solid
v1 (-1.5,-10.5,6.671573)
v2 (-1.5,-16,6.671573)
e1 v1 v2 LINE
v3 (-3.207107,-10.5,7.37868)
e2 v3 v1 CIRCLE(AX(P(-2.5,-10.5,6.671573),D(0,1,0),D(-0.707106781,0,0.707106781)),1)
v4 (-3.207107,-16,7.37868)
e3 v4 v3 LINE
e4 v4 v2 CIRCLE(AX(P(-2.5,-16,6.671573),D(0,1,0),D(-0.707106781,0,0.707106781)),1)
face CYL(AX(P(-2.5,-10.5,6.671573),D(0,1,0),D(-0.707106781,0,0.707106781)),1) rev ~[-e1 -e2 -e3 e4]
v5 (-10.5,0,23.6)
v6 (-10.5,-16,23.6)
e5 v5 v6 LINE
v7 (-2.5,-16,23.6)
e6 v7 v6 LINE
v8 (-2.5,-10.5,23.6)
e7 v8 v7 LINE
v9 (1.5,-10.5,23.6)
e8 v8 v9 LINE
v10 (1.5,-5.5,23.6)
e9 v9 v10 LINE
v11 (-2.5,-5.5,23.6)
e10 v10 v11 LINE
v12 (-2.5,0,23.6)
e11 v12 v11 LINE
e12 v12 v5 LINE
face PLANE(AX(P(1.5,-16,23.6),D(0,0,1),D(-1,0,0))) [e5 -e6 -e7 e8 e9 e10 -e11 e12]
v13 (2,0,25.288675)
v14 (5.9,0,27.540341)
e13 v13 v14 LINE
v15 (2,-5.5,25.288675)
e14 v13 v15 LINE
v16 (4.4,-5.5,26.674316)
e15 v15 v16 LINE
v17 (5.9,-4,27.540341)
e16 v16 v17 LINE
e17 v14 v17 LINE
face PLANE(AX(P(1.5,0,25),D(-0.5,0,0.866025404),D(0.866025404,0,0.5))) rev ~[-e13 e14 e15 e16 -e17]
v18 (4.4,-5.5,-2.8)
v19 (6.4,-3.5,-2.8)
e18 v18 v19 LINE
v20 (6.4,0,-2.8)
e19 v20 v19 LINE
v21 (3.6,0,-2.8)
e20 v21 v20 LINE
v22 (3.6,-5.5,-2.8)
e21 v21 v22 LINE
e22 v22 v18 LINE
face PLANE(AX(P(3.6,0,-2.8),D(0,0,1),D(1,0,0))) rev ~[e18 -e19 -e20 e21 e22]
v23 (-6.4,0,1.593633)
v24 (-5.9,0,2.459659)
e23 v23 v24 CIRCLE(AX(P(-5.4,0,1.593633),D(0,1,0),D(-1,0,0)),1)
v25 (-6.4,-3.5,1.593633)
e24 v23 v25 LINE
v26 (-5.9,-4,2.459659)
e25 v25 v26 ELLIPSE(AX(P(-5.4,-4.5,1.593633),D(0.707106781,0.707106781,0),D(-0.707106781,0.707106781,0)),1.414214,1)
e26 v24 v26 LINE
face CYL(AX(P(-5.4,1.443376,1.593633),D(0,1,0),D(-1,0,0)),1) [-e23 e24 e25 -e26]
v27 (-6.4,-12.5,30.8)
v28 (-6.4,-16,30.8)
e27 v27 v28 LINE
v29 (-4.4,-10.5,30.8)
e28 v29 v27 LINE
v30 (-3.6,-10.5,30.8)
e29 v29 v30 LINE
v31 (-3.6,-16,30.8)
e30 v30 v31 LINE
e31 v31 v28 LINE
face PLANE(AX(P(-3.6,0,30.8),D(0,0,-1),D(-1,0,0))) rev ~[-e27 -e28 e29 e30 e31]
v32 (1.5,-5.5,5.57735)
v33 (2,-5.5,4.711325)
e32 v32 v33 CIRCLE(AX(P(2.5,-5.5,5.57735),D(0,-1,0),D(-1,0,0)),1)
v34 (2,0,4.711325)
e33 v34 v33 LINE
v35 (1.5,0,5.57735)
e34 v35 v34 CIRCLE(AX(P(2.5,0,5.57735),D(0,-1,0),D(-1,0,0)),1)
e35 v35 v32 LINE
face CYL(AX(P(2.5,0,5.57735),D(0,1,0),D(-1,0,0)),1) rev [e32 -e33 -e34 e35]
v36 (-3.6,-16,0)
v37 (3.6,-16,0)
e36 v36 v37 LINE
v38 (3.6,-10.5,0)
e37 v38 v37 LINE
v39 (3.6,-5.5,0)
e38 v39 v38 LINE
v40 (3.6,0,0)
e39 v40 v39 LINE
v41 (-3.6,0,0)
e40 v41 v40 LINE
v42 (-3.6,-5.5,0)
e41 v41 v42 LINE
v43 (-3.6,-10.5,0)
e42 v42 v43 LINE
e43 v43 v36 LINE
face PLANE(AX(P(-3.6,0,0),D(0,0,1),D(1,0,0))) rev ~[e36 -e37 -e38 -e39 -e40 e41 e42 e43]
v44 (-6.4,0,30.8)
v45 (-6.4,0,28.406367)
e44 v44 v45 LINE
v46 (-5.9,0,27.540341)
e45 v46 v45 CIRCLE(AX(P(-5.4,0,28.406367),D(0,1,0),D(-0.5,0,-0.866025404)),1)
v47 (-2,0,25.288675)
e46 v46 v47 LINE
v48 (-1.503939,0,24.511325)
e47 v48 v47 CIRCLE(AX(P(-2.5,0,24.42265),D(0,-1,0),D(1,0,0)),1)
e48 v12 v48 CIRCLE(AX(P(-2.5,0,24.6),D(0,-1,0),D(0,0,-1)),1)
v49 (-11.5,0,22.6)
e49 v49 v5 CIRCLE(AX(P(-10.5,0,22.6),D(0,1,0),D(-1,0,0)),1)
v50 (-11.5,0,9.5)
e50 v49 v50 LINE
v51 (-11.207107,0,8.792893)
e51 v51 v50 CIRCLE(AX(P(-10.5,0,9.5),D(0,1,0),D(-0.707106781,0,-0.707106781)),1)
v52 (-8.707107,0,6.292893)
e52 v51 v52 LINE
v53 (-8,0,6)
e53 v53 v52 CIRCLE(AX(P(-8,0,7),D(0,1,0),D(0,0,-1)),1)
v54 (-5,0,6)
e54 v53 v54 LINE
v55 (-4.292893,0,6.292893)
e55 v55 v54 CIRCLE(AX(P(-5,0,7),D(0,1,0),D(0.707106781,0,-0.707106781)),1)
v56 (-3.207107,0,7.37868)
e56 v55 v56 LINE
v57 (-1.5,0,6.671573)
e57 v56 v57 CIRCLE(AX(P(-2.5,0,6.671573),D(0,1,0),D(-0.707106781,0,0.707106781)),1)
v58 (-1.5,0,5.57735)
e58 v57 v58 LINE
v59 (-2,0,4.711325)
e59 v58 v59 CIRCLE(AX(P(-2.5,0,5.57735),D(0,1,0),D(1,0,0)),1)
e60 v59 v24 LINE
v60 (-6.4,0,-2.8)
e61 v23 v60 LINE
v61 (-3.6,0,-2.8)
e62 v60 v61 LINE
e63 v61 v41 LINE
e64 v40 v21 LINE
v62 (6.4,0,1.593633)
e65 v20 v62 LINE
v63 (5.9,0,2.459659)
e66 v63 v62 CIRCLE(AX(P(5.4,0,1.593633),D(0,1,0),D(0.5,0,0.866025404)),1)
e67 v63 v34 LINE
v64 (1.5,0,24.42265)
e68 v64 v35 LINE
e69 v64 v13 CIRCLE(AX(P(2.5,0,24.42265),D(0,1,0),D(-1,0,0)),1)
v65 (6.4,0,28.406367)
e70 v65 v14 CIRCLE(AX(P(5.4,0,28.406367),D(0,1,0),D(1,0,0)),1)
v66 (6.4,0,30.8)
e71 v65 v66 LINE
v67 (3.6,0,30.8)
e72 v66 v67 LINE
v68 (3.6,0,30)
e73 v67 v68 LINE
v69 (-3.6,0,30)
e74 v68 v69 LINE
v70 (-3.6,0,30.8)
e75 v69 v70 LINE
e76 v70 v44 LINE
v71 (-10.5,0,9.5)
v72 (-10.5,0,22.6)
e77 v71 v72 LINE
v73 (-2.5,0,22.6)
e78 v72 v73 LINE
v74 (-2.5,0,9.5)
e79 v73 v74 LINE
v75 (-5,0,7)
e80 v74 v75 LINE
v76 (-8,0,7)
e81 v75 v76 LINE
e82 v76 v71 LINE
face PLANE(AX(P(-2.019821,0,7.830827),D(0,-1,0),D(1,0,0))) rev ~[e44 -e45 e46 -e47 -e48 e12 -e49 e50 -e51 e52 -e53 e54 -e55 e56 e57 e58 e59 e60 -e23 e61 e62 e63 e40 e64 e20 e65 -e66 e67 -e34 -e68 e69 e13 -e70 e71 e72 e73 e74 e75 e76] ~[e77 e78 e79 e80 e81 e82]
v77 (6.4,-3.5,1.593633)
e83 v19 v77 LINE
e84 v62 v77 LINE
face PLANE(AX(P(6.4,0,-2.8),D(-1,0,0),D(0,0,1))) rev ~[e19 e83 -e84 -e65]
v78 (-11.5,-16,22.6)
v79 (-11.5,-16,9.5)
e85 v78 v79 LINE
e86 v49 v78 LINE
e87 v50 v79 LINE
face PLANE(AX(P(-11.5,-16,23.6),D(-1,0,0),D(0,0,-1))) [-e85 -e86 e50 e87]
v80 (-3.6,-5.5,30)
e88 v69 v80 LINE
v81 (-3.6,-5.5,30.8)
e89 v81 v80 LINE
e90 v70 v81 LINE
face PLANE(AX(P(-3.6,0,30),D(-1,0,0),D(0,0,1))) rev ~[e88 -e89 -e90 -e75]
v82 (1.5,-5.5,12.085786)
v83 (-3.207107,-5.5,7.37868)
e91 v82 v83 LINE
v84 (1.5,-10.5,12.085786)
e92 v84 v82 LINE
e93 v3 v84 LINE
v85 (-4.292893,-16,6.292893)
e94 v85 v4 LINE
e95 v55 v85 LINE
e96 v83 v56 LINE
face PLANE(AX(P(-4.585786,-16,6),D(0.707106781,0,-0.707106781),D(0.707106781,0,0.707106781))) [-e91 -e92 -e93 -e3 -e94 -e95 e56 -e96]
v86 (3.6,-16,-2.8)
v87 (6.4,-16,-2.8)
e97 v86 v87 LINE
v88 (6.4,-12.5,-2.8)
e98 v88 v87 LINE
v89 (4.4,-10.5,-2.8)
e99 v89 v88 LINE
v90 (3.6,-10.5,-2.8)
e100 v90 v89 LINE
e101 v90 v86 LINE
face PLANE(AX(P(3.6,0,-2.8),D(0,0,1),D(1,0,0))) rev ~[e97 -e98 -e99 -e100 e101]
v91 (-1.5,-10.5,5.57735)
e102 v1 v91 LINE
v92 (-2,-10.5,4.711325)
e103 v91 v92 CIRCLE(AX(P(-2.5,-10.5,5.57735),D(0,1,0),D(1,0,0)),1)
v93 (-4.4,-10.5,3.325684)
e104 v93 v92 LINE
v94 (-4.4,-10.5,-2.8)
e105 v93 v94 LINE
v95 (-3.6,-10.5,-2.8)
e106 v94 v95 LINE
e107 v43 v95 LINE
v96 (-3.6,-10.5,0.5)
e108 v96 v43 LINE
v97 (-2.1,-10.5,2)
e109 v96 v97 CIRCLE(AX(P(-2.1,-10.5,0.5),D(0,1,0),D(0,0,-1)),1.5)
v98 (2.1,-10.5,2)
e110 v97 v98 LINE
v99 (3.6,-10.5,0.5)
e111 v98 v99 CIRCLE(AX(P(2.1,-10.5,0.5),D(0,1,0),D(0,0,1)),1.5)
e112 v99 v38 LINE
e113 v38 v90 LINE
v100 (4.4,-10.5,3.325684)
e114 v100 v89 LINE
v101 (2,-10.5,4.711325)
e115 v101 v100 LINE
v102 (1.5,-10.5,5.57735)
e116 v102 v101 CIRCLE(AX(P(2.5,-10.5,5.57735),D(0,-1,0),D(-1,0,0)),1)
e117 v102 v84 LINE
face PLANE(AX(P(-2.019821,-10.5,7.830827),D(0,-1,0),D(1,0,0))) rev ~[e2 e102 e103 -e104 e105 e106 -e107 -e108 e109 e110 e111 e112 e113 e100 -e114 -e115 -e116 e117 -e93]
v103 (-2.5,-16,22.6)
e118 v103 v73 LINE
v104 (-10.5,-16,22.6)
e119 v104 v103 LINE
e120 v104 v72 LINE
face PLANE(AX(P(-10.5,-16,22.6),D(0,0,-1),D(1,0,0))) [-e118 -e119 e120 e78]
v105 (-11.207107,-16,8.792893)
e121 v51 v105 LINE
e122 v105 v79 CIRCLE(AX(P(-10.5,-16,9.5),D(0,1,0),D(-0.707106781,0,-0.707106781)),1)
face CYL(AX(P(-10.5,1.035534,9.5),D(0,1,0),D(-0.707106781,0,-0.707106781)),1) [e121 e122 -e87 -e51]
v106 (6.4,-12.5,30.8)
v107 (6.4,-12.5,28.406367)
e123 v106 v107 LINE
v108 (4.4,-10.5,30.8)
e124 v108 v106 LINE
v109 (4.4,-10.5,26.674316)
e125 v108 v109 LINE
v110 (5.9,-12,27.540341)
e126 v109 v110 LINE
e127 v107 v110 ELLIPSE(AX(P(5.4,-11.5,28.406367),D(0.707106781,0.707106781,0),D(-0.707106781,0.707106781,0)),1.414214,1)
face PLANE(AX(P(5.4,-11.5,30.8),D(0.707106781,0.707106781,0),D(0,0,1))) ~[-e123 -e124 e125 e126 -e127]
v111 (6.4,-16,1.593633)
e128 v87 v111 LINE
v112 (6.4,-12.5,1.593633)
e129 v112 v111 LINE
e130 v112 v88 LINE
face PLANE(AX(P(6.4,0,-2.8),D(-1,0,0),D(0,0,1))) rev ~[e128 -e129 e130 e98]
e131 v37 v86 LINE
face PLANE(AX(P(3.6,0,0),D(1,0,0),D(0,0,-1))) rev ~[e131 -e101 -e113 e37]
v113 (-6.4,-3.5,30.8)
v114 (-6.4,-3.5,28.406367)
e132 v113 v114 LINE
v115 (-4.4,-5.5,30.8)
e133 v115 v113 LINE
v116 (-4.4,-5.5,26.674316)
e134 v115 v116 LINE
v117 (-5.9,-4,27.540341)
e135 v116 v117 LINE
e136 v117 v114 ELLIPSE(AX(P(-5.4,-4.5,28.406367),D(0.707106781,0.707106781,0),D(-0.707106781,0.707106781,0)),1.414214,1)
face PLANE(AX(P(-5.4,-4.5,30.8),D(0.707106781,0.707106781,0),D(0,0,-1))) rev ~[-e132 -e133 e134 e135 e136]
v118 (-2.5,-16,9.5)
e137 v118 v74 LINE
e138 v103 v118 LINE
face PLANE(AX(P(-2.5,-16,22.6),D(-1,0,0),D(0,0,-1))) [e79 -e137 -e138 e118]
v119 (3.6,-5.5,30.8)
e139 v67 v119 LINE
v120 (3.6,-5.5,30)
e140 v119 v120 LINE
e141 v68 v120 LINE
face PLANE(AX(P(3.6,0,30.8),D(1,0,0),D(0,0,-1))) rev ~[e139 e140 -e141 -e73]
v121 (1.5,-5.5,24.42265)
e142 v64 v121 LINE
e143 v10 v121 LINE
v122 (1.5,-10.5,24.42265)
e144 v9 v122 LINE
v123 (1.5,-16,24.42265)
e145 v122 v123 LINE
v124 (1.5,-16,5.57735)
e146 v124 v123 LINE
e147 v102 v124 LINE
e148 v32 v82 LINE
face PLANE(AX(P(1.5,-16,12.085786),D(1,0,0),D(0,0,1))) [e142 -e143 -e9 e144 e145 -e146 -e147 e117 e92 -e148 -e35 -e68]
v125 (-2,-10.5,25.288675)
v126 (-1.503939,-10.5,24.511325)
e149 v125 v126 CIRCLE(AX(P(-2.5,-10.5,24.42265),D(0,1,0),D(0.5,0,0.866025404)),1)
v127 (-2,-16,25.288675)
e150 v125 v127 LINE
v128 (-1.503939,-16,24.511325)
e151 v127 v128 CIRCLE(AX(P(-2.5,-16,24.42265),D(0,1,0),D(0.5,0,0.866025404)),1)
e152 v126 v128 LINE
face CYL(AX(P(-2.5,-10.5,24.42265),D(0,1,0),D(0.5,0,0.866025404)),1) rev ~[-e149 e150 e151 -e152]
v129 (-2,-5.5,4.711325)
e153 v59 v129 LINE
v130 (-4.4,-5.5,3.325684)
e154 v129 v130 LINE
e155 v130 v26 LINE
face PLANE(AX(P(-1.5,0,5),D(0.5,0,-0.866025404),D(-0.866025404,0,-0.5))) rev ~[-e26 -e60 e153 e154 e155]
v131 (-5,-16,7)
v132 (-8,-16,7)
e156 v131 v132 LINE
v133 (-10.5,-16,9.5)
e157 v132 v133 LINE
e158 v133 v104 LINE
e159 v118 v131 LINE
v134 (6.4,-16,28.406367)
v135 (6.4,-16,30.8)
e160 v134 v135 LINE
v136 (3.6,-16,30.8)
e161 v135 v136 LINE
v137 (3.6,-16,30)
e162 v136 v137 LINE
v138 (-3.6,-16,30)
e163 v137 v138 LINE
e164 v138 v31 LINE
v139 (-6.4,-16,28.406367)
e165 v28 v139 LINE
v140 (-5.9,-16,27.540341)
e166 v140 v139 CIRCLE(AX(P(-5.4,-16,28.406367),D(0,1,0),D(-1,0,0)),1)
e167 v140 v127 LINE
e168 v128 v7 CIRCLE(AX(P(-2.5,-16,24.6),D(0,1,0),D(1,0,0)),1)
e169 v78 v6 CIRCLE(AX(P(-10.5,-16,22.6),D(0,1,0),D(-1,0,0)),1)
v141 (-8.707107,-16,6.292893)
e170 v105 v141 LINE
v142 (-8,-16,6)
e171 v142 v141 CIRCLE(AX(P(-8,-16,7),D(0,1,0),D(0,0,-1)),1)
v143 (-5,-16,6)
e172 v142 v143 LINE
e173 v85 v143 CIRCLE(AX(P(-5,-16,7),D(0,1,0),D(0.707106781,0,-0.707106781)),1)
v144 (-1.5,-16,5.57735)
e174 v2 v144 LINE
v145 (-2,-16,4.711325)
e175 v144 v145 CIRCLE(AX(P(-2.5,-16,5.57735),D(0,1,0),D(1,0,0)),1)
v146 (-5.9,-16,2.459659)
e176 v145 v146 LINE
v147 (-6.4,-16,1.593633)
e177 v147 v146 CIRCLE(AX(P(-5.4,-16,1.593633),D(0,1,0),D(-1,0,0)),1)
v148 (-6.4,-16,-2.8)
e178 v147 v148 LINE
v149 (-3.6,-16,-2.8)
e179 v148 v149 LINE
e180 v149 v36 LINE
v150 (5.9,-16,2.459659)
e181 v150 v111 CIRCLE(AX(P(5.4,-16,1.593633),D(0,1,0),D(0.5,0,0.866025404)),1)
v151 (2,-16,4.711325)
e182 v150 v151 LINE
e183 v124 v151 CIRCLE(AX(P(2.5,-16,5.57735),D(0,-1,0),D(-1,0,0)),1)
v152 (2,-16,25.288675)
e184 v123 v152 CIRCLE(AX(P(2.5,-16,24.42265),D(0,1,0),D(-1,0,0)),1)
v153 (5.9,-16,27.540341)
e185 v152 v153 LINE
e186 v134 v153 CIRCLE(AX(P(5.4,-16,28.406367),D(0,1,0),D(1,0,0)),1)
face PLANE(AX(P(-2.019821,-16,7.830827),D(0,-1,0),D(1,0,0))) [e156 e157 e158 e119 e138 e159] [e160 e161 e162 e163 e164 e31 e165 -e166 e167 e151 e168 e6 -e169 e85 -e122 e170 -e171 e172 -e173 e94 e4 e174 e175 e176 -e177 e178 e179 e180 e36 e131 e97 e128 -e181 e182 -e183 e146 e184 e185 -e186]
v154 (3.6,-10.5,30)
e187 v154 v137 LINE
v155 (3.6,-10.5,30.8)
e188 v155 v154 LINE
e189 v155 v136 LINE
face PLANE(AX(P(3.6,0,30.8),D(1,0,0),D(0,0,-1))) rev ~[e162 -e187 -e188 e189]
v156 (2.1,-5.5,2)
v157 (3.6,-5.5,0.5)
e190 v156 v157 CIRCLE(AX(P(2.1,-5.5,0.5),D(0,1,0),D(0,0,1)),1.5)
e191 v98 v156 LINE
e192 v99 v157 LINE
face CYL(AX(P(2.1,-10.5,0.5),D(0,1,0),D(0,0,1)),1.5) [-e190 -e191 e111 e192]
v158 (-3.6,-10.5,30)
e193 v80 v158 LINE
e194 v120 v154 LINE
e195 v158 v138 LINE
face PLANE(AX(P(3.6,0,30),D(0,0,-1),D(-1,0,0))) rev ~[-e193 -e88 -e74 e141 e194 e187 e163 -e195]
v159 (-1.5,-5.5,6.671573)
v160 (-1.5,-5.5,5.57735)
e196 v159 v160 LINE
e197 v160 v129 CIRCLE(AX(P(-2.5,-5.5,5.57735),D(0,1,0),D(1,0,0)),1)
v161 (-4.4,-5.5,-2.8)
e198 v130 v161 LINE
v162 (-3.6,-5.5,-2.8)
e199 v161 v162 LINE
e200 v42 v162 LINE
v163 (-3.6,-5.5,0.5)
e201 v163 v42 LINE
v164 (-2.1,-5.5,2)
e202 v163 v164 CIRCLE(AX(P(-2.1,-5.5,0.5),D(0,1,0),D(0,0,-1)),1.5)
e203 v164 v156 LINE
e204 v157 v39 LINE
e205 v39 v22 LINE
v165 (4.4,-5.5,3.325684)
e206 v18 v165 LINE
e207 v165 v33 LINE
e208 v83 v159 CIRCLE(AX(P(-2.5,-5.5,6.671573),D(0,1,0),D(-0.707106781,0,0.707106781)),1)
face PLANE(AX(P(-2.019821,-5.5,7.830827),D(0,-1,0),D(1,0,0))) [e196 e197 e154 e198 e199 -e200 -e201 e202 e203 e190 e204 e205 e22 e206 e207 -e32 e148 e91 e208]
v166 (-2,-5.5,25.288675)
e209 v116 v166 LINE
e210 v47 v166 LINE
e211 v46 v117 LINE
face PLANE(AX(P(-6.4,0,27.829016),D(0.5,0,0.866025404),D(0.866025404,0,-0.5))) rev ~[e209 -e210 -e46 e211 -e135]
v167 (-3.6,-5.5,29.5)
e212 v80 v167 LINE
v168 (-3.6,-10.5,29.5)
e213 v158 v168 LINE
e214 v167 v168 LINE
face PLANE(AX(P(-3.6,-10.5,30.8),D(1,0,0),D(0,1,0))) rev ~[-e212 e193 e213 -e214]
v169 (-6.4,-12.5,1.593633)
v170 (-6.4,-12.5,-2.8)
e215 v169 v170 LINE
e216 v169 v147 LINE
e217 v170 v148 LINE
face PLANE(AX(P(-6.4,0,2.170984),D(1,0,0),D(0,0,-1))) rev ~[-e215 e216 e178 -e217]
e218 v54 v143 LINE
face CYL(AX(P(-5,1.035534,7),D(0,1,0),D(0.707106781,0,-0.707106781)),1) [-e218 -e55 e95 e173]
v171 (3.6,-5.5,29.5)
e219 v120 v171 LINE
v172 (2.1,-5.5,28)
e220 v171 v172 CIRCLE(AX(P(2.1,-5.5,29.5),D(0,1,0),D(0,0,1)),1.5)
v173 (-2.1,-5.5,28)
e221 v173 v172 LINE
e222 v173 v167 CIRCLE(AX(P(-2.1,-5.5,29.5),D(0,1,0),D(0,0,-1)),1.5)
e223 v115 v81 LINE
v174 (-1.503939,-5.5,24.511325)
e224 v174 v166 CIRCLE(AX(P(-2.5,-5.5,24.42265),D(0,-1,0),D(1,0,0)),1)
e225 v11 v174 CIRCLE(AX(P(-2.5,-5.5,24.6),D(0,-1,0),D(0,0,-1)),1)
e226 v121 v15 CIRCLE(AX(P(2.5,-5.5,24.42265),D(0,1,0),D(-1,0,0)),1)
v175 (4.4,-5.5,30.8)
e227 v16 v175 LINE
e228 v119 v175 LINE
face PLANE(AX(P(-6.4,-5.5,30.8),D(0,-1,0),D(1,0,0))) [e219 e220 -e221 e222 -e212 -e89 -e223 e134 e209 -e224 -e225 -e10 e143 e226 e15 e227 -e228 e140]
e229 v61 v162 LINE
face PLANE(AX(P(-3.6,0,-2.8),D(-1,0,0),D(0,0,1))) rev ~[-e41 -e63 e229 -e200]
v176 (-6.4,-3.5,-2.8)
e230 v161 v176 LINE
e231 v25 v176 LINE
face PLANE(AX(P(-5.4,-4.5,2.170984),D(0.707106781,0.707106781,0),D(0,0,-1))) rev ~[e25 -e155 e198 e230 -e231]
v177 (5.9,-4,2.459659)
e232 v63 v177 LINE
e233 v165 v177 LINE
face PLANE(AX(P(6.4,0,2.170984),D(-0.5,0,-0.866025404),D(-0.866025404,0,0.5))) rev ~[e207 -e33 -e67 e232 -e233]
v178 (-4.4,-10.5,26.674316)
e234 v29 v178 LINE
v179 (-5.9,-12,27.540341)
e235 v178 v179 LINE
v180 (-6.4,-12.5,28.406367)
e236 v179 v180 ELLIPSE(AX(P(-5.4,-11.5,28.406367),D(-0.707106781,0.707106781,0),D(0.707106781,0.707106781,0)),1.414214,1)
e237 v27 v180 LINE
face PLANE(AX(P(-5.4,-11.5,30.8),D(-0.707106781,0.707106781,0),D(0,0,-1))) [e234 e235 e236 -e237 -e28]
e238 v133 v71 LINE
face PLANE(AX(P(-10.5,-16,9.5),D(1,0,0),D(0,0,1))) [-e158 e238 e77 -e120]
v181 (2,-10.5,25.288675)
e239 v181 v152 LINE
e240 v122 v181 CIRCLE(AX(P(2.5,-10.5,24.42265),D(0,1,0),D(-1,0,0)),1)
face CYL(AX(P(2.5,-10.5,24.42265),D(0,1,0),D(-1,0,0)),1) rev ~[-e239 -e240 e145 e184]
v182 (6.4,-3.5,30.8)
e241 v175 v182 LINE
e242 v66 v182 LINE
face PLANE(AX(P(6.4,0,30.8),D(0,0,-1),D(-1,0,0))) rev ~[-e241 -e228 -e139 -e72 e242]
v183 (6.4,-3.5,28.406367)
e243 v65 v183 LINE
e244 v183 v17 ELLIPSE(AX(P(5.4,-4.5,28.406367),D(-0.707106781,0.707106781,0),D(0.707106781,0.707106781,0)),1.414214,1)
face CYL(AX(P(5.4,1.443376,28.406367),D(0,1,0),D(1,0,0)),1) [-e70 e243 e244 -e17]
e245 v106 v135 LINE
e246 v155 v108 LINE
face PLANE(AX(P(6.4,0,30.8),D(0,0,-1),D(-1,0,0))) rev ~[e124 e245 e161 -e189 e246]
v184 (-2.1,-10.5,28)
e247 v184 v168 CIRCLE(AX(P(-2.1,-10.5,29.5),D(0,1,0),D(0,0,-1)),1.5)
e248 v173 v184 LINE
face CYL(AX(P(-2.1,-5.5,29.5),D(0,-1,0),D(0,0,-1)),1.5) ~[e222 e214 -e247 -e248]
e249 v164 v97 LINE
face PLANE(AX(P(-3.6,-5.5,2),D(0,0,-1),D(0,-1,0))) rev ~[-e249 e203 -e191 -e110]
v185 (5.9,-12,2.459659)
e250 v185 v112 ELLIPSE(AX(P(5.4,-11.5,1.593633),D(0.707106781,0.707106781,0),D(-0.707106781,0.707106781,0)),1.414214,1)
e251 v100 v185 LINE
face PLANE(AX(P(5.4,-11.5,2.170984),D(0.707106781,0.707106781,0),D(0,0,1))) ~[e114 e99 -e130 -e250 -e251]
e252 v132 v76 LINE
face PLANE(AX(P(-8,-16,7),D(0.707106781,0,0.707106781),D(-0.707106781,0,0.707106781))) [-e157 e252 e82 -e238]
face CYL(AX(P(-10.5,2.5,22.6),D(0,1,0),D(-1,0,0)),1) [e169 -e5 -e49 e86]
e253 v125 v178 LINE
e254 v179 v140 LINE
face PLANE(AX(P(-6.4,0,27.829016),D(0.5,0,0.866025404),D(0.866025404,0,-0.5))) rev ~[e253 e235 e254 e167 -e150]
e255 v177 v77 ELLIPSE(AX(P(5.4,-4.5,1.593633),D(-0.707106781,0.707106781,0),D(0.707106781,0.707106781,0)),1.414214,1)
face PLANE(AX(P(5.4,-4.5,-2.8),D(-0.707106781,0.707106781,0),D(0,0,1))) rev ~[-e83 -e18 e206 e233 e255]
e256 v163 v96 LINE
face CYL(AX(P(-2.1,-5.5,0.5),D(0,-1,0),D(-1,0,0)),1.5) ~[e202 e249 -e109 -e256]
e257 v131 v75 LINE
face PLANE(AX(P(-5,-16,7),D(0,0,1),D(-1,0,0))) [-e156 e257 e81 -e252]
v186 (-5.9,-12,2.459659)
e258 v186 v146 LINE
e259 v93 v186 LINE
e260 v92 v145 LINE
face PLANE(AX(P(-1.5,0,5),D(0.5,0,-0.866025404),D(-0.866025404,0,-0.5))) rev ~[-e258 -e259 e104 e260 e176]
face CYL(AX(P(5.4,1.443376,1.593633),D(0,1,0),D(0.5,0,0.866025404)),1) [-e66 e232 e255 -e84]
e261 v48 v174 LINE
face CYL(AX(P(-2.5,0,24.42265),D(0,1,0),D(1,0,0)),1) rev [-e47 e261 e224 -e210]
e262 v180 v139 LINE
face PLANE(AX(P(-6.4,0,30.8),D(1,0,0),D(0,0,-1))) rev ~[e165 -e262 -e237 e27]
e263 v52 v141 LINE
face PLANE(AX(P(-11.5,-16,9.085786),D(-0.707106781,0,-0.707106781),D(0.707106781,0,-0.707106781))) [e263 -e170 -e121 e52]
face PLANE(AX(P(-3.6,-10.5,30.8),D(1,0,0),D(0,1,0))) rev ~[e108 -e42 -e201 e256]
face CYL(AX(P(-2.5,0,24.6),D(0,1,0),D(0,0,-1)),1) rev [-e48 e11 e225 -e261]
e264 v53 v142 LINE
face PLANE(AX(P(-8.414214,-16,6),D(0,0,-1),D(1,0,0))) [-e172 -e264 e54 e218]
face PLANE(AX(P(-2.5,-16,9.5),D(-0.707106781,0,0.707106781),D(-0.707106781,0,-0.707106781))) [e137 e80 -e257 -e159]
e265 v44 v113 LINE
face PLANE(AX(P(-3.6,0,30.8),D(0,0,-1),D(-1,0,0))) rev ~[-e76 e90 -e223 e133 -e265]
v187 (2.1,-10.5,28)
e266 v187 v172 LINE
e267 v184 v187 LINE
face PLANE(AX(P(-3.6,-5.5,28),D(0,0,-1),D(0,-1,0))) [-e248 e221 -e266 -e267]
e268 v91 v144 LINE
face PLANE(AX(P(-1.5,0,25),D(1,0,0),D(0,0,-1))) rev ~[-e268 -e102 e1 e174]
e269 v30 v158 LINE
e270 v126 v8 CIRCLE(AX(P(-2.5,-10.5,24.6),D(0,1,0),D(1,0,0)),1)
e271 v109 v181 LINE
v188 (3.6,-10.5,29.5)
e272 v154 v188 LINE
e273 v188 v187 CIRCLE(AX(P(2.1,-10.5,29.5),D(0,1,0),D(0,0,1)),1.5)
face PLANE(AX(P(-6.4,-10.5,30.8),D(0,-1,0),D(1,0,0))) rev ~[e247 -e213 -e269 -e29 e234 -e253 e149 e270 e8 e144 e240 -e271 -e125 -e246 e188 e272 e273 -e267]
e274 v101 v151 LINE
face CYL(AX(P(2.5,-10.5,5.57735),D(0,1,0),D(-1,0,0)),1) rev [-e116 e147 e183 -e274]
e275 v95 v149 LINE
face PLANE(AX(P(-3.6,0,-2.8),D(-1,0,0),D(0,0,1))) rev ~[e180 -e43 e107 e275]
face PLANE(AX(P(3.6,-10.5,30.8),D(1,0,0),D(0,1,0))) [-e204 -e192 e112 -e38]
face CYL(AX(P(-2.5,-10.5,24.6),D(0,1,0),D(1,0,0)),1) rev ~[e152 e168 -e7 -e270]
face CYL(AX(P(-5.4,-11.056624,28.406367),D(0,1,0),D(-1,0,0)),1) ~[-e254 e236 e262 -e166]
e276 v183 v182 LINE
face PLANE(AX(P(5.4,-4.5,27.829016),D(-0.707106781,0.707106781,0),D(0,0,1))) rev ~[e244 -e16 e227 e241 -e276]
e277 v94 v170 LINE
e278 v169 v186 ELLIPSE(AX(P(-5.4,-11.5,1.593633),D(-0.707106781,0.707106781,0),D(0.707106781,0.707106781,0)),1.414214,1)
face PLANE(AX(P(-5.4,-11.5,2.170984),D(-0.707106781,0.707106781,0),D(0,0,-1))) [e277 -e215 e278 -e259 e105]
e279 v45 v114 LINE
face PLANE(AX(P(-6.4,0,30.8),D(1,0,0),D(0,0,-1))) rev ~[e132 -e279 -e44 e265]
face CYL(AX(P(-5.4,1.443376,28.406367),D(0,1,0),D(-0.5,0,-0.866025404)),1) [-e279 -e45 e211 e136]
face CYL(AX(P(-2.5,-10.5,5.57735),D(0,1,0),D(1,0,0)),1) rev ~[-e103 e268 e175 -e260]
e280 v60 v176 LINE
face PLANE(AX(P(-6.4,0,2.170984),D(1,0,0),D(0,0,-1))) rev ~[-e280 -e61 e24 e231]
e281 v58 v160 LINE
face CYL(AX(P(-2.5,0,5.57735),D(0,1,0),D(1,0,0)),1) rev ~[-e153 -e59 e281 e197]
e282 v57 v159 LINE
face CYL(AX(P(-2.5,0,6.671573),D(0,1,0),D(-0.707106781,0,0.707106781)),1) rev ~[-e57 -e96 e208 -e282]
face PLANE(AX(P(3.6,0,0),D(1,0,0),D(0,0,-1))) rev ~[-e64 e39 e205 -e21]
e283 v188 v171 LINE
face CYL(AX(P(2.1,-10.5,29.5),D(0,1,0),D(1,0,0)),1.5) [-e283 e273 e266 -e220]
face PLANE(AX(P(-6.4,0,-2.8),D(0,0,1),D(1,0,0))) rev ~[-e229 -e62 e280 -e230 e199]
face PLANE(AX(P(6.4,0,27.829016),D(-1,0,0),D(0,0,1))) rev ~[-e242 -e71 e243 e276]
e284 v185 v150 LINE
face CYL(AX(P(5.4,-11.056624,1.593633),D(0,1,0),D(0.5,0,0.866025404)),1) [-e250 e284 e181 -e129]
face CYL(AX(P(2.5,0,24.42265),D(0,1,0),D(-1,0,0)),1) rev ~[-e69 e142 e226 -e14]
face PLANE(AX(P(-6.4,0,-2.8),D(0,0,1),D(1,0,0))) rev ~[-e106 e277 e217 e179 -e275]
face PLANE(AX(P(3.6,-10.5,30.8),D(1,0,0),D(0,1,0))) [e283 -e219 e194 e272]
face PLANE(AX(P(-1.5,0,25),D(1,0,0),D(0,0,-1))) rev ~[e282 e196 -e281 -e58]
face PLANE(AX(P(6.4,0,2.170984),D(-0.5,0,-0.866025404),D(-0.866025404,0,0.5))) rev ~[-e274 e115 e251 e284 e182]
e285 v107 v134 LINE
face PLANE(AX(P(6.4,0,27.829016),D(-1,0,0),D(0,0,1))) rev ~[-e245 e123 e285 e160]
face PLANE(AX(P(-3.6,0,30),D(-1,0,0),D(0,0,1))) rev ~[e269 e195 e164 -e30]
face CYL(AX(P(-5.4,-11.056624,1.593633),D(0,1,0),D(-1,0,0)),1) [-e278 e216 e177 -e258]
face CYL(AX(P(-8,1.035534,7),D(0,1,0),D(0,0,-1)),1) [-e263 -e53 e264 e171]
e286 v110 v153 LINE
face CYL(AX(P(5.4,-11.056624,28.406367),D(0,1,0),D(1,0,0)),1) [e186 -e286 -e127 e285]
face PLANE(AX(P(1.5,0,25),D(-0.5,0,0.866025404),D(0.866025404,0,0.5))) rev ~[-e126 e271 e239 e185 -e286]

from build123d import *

# Parameters (mm, degrees)
F1_DEPTH      = 16
F2_W          = 2.8
F2_H          = 5
F3_DEPTH      = 33.601
F4_W          = 5
F4_H          = 26
F5_DEPTH      = 10.001
F7_DEPTH      = 16
F8_R          = 1.5
F9_SIZE       = 2
F10_T1_DEPTH  = 5.5
F10_T3_DEPTH  = 5.5
F10_T8_DEPTH  = 11.5355339059
F10_T13_DEPTH = 11.5355339059
F10_T15_DEPTH = 21
F10_T17_DEPTH = 18.0710678119
F10_T19_DEPTH = 6.3867513459
F10_T21_DEPTH = 6.3867513459


# Not quite as in the source:
# - a fillet or chamfer that OpenCascade refuses, or shapes differently, is made with other operations: its cross-section is extruded or revolved along the edge and cut away or added


with BuildPart() as f1:
    # F0 (on Front) → F1 (new body)
    with BuildSketch(Plane.XZ):
        Polygon((-3.6, 30.8), (-6.4, 30.8), (-6.4, 27.829016319), (-1.5, 25), (-1.5, 5), (-6.4, 2.170983681), (-6.4, -2.8), (-3.6, -2.8), (-3.6, 0), (3.6, 0), (3.6, -2.8), (6.4, -2.8), (6.4, 2.170983681), (1.5, 5), (1.5, 25), (6.4, 27.829016319), (6.4, 30.8), (3.6, 30.8), (3.6, 30), (-3.6, 30), align=None)
    extrude(amount=F1_DEPTH)

    # F2 (on face) → F3 (cut, through all)
    with BuildSketch(Plane.XY.offset(30.8)):
        with Locations((-5, -8)):
            Rectangle(F2_W, F2_H)
        with Locations((5, -8)):
            Rectangle(F2_W, F2_H)
    extrude(amount=-F3_DEPTH, mode=Mode.SUBTRACT)

    # F4 (on face) → F5 (cut, through all)
    with BuildSketch(Plane(origin=(-3.6, 0, 0), x_dir=(0, -1, 0), z_dir=(-1, 0, 0))):
        with Locations((8, 15)):
            Rectangle(F4_W, F4_H)
    extrude(amount=-F5_DEPTH, mode=Mode.SUBTRACT)

    # F6 (on face) → F7 (join, through all)
    with BuildSketch(Plane.XZ.offset(16)):
        Polygon((-8.4142135624, 6), (-4.5857864376, 6), (1.5, 12.0857864376), (1.5, 23.6), (-11.5, 23.6), (-11.5, 9.0857864376), align=None)
        Polygon((-10.5, 9.5), (-10.5, 22.6), (-2.5, 22.6), (-2.5, 9.5), (-5, 7), (-8, 7), align=None, mode=Mode.SUBTRACT)
    extrude(amount=-F7_DEPTH)

    # F8
    f8_edges = [f1.edges().sort_by_distance(p)[0] for p in [
        (3.6, -8, 2),
        (3.6, -8, 28),
        (-3.6, -8, 28),
        (-3.6, -8, 2),
    ]]
    fillet(f8_edges, radius=F8_R)

    # F9
    f9_edges = [f1.edges().sort_by_distance(p)[0] for p in [
        (6.4, -10.5, -0.314508),
        (6.4, -5.5, -0.314508),
        (6.4, -10.5, 29.314508),
        (6.4, -5.5, 29.314508),
        (-6.4, -5.5, -0.314508),
        (-6.4, -10.5, -0.314508),
        (-6.4, -5.5, 29.314508),
        (-6.4, -10.5, 29.314508),
    ]]
    chamfer(f9_edges, length=F9_SIZE)

    # F10: fillet of radius 1 on 24 edges, made by hand

    # F10_s2 → F10_t1 (join)
    with BuildSketch(Plane.XZ.offset(10.5)):
        with BuildLine():
            ThreePointArc((-3.2071067812, 7.3786796564), (-2.1173165676, 7.5954524078), (-1.5, 6.6715728753))
            Line((-1.5, 6.6715728753), (-1.5, 9.0857864376))
            Line((-1.5, 9.0857864376), (-3.2071067812, 7.3786796564))
        make_face()
        with BuildLine():
            ThreePointArc((-1.5, 24.6), (-1.7928932188, 23.8928932188), (-2.5, 23.6))
            Line((-2.5, 23.6), (-1.5, 23.6))
            Line((-1.5, 23.6), (-1.5, 24.6))
        make_face()
        with BuildLine():
            ThreePointArc((1.5, 5.5773502692), (1.6339745962, 5.0773502692), (2, 4.7113248654))
            Line((2, 4.7113248654), (1.5, 5))
            Line((1.5, 5), (1.5, 5.5773502692))
        make_face()
        with BuildLine():
            ThreePointArc((1.5, 24.4226497308), (1.6339745962, 24.9226497308), (2, 25.2886751346))
            Line((2, 25.2886751346), (1.5, 25))
            Line((1.5, 25), (1.5, 24.4226497308))
        make_face()
        with BuildLine():
            ThreePointArc((-1.5, 5.5773502692), (-1.6339745962, 5.0773502692), (-2, 4.7113248654))
            Line((-2, 4.7113248654), (-1.5, 5))
            Line((-1.5, 5), (-1.5, 5.5773502692))
        make_face()
        with BuildLine():
            ThreePointArc((-2, 25.2886751346), (-1.6339745962, 24.9226497308), (-1.5, 24.4226497308))
            Line((-1.5, 24.4226497308), (-1.5, 25))
            Line((-1.5, 25), (-2, 25.2886751346))
        make_face()
    extrude(amount=F10_T1_DEPTH)

    # F10_s4 → F10_t3 (join)
    with BuildSketch(Plane.XZ):
        with BuildLine():
            ThreePointArc((-3.2071067812, 7.3786796564), (-2.1173165676, 7.5954524078), (-1.5, 6.6715728753))
            Line((-1.5, 6.6715728753), (-1.5, 9.0857864376))
            Line((-1.5, 9.0857864376), (-3.2071067812, 7.3786796564))
        make_face()
        with BuildLine():
            ThreePointArc((-2.5, 23.6), (-1.7928932188, 23.8928932188), (-1.5, 24.6))
            Line((-1.5, 24.6), (-1.5, 23.6))
            Line((-1.5, 23.6), (-2.5, 23.6))
        make_face()
        with BuildLine():
            ThreePointArc((1.5, 5.5773502692), (1.6339745962, 5.0773502692), (2, 4.7113248654))
            Line((2, 4.7113248654), (1.5, 5))
            Line((1.5, 5), (1.5, 5.5773502692))
        make_face()
        with BuildLine():
            ThreePointArc((1.5, 24.4226497308), (1.6339745962, 24.9226497308), (2, 25.2886751346))
            Line((2, 25.2886751346), (1.5, 25))
            Line((1.5, 25), (1.5, 24.4226497308))
        make_face()
        with BuildLine():
            ThreePointArc((-1.5, 5.5773502692), (-1.6339745962, 5.0773502692), (-2, 4.7113248654))
            Line((-2, 4.7113248654), (-1.5, 5))
            Line((-1.5, 5), (-1.5, 5.5773502692))
        make_face()
        with BuildLine():
            ThreePointArc((-1.5, 24.4226497308), (-1.6339745962, 24.9226497308), (-2, 25.2886751346))
            Line((-2, 25.2886751346), (-1.5, 25))
            Line((-1.5, 25), (-1.5, 24.4226497308))
        make_face()
    extrude(amount=F10_T3_DEPTH)


with BuildPart() as f10_tool6:
    # F10_s7 → F10_t8 (new body)
    with BuildSketch(Plane.XZ.offset(16)):
        with BuildLine():
            ThreePointArc((-3.2071067812, 7.3786796564), (-2.1173165676, 7.5954524078), (-1.5, 6.6715728753))
            Line((-1.5, 6.6715728753), (-1.5, 9.0857864376))
            Line((-1.5, 9.0857864376), (-3.2071067812, 7.3786796564))
        make_face()
    extrude(amount=-F10_T8_DEPTH)

    split(bisect_by=Plane.XZ.offset(5.5), keep=Keep.BOTTOM)


with BuildPart() as f1_1:
    add(f1.part)

    # F10_t5: union F10_tool6
    add(f10_tool6.part)


with BuildPart() as f10_tool11:
    # F10_s12 → F10_t13 (new body)
    with BuildSketch(Plane.XZ.offset(11.5355339059)):
        with BuildLine():
            ThreePointArc((-3.2071067812, 7.3786796564), (-2.1173165676, 7.5954524078), (-1.5, 6.6715728753))
            Line((-1.5, 6.6715728753), (-1.5, 9.0857864376))
            Line((-1.5, 9.0857864376), (-3.2071067812, 7.3786796564))
        make_face()
    extrude(amount=-F10_T13_DEPTH)

    split(bisect_by=Plane.XZ.offset(10.5), keep=Keep.TOP)


with BuildPart() as f1_2:
    add(f1_1.part)

    # F10_t10: union F10_tool11
    add(f10_tool11.part)

    # F10_s16 → F10_t15 (cut)
    with BuildSketch(Plane.XZ.offset(-2.5)):
        with BuildLine():
            ThreePointArc((-11.5, 22.6), (-11.2071067812, 23.3071067812), (-10.5, 23.6))
            Line((-10.5, 23.6), (-11.5, 23.6))
            Line((-11.5, 23.6), (-11.5, 22.6))
        make_face()
    extrude(amount=F10_T15_DEPTH, mode=Mode.SUBTRACT)

    # F10_s18 → F10_t17 (cut)
    with BuildSketch(Plane.XZ.offset(-1.0355339059)):
        with BuildLine():
            ThreePointArc((-11.2071067812, 8.7928932188), (-11.4238795325, 9.1173165676), (-11.5, 9.5))
            Line((-11.5, 9.5), (-11.5, 9.0857864376))
            Line((-11.5, 9.0857864376), (-11.2071067812, 8.7928932188))
        make_face()
        with BuildLine():
            ThreePointArc((-8, 6), (-8.3826834324, 6.0761204675), (-8.7071067812, 6.2928932188))
            Line((-8.7071067812, 6.2928932188), (-8.4142135624, 6))
            Line((-8.4142135624, 6), (-8, 6))
        make_face()
        with BuildLine():
            ThreePointArc((-4.2928932188, 6.2928932188), (-4.6173165676, 6.0761204675), (-5, 6))
            Line((-5, 6), (-4.5857864376, 6))
            Line((-4.5857864376, 6), (-4.2928932188, 6.2928932188))
        make_face()
    extrude(amount=F10_T17_DEPTH, mode=Mode.SUBTRACT)

    # F10_s20 → F10_t19 (cut)
    with BuildSketch(Plane.XZ.offset(11.056624327)):
        with BuildLine():
            ThreePointArc((-6.4, 1.5936334118), (-6.2660254038, 2.0936334118), (-5.9, 2.4596588156))
            Line((-5.9, 2.4596588156), (-6.4, 2.170983681))
            Line((-6.4, 2.170983681), (-6.4, 1.5936334118))
        make_face()
        with BuildLine():
            ThreePointArc((-6.4, 28.4063665882), (-6.2660254038, 27.9063665882), (-5.9, 27.5403411844))
            Line((-5.9, 27.5403411844), (-6.4, 27.829016319))
            Line((-6.4, 27.829016319), (-6.4, 28.4063665882))
        make_face()
        with BuildLine():
            ThreePointArc((6.4, 28.4063665882), (6.2660254038, 27.9063665882), (5.9, 27.5403411844))
            Line((5.9, 27.5403411844), (6.4, 27.829016319))
            Line((6.4, 27.829016319), (6.4, 28.4063665882))
        make_face()
        with BuildLine():
            ThreePointArc((5.9, 2.4596588156), (6.2660254038, 2.0936334118), (6.4, 1.5936334118))
            Line((6.4, 1.5936334118), (6.4, 2.170983681))
            Line((6.4, 2.170983681), (5.9, 2.4596588156))
        make_face()
    extrude(amount=F10_T19_DEPTH, mode=Mode.SUBTRACT)

    # F10_s22 → F10_t21 (cut)
    with BuildSketch(Plane.XZ.offset(-1.443375673)):
        with BuildLine():
            ThreePointArc((-6.4, 1.5936334118), (-6.2660254038, 2.0936334118), (-5.9, 2.4596588156))
            Line((-5.9, 2.4596588156), (-6.4, 2.170983681))
            Line((-6.4, 2.170983681), (-6.4, 1.5936334118))
        make_face()
        with BuildLine():
            ThreePointArc((-5.9, 27.5403411844), (-6.2660254038, 27.9063665882), (-6.4, 28.4063665882))
            Line((-6.4, 28.4063665882), (-6.4, 27.829016319))
            Line((-6.4, 27.829016319), (-5.9, 27.5403411844))
        make_face()
        with BuildLine():
            ThreePointArc((6.4, 28.4063665882), (6.2660254038, 27.9063665882), (5.9, 27.5403411844))
            Line((5.9, 27.5403411844), (6.4, 27.829016319))
            Line((6.4, 27.829016319), (6.4, 28.4063665882))
        make_face()
        with BuildLine():
            ThreePointArc((5.9, 2.4596588156), (6.2660254038, 2.0936334118), (6.4, 1.5936334118))
            Line((6.4, 1.5936334118), (6.4, 2.170983681))
            Line((6.4, 2.170983681), (5.9, 2.4596588156))
        make_face()
    extrude(amount=F10_T21_DEPTH, mode=Mode.SUBTRACT)


solid = f1_2.part
